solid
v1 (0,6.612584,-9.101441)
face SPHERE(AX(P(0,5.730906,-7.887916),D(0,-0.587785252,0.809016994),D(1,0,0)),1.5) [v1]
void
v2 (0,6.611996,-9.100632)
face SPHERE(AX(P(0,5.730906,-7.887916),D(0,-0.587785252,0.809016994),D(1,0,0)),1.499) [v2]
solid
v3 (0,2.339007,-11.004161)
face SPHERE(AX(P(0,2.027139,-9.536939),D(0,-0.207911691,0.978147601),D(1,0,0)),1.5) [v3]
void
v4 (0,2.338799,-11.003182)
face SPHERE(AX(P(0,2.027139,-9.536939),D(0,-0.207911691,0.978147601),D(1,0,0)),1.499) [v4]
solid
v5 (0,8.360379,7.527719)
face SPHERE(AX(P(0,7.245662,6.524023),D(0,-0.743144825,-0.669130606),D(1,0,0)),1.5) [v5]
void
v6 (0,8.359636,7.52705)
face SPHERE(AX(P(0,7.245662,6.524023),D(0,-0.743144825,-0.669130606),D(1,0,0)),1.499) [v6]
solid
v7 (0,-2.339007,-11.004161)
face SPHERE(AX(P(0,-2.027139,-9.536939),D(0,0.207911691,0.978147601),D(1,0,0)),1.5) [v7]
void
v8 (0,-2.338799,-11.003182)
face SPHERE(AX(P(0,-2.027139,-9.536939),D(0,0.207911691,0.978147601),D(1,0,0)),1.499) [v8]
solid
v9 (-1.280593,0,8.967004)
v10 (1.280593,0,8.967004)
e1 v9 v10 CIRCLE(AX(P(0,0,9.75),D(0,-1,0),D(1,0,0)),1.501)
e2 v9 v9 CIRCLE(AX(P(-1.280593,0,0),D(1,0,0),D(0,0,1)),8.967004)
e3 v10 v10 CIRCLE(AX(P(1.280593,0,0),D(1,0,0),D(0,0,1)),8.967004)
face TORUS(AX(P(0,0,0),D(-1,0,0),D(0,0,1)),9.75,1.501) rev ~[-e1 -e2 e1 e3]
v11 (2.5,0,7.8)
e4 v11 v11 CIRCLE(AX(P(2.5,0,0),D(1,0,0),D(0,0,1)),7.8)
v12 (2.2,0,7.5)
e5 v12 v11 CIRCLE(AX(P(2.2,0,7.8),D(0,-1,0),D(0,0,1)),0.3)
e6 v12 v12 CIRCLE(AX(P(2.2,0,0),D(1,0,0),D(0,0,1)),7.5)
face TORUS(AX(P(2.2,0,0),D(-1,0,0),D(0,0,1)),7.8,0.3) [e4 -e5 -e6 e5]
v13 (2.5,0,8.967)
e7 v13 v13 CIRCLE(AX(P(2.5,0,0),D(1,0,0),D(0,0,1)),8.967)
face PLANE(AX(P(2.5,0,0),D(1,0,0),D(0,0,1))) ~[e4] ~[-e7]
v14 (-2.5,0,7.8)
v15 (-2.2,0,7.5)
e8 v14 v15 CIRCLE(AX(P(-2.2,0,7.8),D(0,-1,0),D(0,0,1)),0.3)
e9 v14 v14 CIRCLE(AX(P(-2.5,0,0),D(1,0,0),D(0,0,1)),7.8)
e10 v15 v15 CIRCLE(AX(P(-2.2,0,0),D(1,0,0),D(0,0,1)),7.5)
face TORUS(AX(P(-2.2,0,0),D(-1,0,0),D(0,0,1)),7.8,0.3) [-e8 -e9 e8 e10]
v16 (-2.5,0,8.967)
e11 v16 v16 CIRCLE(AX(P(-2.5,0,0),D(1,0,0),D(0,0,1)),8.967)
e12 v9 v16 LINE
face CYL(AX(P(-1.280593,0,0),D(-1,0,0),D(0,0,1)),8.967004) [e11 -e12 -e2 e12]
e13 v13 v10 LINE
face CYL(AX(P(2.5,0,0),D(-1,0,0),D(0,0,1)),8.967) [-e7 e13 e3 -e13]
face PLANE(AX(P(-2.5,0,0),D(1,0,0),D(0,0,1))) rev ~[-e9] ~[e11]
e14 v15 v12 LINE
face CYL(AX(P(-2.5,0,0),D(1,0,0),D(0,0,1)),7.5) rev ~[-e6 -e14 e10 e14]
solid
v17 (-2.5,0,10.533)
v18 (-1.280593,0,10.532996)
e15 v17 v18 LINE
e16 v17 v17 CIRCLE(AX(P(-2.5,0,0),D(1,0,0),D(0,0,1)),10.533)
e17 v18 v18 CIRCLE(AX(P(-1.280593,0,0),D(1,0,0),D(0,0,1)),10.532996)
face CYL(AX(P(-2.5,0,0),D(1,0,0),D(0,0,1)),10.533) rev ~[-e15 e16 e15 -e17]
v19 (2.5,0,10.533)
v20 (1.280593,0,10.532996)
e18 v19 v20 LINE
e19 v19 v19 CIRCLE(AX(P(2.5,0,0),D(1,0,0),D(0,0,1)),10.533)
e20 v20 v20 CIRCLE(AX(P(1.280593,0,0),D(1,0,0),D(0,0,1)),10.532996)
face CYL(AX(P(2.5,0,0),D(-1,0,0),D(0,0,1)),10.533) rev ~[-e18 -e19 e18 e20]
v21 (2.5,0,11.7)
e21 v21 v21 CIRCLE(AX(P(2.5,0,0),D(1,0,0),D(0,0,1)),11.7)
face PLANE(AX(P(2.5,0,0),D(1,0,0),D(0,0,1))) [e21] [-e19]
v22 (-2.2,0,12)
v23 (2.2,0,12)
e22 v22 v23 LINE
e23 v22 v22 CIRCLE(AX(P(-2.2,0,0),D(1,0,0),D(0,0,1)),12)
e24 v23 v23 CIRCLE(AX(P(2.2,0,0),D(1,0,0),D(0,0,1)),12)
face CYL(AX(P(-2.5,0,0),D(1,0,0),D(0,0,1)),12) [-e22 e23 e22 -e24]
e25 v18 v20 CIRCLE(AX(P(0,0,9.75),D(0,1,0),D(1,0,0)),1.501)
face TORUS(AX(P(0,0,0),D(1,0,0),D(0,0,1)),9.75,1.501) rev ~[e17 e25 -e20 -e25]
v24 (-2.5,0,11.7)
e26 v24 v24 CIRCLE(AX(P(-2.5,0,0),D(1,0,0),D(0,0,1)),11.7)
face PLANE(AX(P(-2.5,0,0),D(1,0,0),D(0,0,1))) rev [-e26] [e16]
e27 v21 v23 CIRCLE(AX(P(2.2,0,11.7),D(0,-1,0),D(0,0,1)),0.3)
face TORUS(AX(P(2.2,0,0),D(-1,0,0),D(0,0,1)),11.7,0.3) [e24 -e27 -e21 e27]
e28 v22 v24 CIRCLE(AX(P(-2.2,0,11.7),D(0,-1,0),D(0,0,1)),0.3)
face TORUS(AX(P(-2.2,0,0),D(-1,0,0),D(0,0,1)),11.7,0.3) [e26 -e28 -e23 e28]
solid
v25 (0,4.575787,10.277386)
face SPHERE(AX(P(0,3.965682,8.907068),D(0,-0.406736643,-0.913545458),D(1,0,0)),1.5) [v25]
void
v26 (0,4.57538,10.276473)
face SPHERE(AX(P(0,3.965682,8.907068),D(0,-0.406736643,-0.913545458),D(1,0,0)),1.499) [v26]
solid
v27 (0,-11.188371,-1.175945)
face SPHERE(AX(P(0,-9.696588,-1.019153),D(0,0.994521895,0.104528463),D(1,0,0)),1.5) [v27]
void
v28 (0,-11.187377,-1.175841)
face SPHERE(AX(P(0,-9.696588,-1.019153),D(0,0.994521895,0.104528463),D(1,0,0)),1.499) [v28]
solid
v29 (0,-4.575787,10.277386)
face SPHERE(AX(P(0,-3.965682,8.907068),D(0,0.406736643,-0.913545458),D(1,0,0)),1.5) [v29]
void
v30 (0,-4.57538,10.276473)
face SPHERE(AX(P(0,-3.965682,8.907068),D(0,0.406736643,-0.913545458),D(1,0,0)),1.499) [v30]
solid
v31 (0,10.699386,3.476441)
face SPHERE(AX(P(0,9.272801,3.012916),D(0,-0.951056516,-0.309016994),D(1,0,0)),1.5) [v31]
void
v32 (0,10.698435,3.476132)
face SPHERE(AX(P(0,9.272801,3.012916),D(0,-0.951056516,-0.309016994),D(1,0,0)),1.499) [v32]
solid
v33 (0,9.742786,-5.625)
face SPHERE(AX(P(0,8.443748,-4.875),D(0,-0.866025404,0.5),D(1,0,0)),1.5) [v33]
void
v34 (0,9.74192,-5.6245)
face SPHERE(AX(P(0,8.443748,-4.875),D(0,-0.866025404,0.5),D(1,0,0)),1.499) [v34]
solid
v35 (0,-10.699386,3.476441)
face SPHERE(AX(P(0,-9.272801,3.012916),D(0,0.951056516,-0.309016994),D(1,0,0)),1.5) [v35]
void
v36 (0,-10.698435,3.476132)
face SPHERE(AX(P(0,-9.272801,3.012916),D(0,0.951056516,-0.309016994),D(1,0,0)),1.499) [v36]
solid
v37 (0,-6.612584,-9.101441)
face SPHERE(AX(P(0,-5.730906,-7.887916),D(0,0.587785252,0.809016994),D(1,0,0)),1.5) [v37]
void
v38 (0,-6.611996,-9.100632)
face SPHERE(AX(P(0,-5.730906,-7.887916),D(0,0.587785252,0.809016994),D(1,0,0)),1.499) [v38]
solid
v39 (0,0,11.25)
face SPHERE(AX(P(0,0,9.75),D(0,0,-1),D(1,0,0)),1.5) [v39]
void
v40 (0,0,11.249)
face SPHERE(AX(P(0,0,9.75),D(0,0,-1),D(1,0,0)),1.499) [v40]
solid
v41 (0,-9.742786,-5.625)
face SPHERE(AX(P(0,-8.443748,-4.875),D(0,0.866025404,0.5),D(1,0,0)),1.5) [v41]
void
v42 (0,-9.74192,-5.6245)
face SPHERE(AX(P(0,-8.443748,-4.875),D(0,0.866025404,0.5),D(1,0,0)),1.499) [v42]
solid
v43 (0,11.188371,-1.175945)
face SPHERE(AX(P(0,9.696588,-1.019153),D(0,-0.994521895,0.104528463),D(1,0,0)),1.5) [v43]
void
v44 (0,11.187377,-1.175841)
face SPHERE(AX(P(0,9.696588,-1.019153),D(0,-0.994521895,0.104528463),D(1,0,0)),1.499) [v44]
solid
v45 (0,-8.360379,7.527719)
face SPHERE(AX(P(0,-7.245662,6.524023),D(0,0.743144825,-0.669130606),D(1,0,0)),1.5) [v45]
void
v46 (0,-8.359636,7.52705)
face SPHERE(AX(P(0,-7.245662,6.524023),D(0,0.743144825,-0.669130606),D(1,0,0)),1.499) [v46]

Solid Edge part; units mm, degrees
sketch "Sketch1" plane through (0, 0, 0) normal (0, -1, 0) x (1, 0, 0)
  arc A0 (0, 11.25) -> (0, 8.25) centre (0, 9.75) cw
revolve "RevolvedProtrusion1" add sketch "Sketch1" angle 360 about axis through (0, 0, 30.6346) along (0, 0, 1)
shell "Thinwall1" thickness 0.001 removed faces 0
pattern_circular "Pattern1" count 15 over 360 about axis through (0, 0, 0) along (1, 0, 0) of "RevolvedProtrusion1", "Thinwall1"
sketch "Sketch2" plane through (0, 0, 0) normal (0, -1, 0) x (1, 0, 0)
  line L0 (-2.5, 8.967) -> (-2.5, 7.5)
  line L1 (-2.5, 7.5) -> (2.5, 7.5)
  line L2 (2.5, 7.5) -> (2.5, 8.967)
  line L3 (2.5, 8.967) -> (1.2806, 8.967)
  arc A0 (-1.2806, 8.967) -> (1.2806, 8.967) centre (0, 9.75) ccw
  line L4 (-1.2806, 8.967) -> (-2.5, 8.967)
  line L5 (-2.5, 10.533) -> (-1.2806, 10.533)
  arc A1 (-1.2806, 10.533) -> (1.2806, 10.533) centre (0, 9.75) cw
  line L6 (2.5, 10.533) -> (1.2806, 10.533)
  line L7 (2.5, 12) -> (2.5, 10.533)
  line L8 (-2.5, 12) -> (2.5, 12)
  line L9 (-2.5, 10.533) -> (-2.5, 12)
revolve "RevolvedProtrusion2" add sketch "Sketch2" angle 360 about axis through (-60, 0, 0) along (1, 0, 0)
fillet "Round1" radius 0.3 4 edges at (-2.5, 0, -12) (2.5, 0, -12) (2.5, 0, -7.5) (-2.5, 0, -7.5)
properties material "Stahl"
